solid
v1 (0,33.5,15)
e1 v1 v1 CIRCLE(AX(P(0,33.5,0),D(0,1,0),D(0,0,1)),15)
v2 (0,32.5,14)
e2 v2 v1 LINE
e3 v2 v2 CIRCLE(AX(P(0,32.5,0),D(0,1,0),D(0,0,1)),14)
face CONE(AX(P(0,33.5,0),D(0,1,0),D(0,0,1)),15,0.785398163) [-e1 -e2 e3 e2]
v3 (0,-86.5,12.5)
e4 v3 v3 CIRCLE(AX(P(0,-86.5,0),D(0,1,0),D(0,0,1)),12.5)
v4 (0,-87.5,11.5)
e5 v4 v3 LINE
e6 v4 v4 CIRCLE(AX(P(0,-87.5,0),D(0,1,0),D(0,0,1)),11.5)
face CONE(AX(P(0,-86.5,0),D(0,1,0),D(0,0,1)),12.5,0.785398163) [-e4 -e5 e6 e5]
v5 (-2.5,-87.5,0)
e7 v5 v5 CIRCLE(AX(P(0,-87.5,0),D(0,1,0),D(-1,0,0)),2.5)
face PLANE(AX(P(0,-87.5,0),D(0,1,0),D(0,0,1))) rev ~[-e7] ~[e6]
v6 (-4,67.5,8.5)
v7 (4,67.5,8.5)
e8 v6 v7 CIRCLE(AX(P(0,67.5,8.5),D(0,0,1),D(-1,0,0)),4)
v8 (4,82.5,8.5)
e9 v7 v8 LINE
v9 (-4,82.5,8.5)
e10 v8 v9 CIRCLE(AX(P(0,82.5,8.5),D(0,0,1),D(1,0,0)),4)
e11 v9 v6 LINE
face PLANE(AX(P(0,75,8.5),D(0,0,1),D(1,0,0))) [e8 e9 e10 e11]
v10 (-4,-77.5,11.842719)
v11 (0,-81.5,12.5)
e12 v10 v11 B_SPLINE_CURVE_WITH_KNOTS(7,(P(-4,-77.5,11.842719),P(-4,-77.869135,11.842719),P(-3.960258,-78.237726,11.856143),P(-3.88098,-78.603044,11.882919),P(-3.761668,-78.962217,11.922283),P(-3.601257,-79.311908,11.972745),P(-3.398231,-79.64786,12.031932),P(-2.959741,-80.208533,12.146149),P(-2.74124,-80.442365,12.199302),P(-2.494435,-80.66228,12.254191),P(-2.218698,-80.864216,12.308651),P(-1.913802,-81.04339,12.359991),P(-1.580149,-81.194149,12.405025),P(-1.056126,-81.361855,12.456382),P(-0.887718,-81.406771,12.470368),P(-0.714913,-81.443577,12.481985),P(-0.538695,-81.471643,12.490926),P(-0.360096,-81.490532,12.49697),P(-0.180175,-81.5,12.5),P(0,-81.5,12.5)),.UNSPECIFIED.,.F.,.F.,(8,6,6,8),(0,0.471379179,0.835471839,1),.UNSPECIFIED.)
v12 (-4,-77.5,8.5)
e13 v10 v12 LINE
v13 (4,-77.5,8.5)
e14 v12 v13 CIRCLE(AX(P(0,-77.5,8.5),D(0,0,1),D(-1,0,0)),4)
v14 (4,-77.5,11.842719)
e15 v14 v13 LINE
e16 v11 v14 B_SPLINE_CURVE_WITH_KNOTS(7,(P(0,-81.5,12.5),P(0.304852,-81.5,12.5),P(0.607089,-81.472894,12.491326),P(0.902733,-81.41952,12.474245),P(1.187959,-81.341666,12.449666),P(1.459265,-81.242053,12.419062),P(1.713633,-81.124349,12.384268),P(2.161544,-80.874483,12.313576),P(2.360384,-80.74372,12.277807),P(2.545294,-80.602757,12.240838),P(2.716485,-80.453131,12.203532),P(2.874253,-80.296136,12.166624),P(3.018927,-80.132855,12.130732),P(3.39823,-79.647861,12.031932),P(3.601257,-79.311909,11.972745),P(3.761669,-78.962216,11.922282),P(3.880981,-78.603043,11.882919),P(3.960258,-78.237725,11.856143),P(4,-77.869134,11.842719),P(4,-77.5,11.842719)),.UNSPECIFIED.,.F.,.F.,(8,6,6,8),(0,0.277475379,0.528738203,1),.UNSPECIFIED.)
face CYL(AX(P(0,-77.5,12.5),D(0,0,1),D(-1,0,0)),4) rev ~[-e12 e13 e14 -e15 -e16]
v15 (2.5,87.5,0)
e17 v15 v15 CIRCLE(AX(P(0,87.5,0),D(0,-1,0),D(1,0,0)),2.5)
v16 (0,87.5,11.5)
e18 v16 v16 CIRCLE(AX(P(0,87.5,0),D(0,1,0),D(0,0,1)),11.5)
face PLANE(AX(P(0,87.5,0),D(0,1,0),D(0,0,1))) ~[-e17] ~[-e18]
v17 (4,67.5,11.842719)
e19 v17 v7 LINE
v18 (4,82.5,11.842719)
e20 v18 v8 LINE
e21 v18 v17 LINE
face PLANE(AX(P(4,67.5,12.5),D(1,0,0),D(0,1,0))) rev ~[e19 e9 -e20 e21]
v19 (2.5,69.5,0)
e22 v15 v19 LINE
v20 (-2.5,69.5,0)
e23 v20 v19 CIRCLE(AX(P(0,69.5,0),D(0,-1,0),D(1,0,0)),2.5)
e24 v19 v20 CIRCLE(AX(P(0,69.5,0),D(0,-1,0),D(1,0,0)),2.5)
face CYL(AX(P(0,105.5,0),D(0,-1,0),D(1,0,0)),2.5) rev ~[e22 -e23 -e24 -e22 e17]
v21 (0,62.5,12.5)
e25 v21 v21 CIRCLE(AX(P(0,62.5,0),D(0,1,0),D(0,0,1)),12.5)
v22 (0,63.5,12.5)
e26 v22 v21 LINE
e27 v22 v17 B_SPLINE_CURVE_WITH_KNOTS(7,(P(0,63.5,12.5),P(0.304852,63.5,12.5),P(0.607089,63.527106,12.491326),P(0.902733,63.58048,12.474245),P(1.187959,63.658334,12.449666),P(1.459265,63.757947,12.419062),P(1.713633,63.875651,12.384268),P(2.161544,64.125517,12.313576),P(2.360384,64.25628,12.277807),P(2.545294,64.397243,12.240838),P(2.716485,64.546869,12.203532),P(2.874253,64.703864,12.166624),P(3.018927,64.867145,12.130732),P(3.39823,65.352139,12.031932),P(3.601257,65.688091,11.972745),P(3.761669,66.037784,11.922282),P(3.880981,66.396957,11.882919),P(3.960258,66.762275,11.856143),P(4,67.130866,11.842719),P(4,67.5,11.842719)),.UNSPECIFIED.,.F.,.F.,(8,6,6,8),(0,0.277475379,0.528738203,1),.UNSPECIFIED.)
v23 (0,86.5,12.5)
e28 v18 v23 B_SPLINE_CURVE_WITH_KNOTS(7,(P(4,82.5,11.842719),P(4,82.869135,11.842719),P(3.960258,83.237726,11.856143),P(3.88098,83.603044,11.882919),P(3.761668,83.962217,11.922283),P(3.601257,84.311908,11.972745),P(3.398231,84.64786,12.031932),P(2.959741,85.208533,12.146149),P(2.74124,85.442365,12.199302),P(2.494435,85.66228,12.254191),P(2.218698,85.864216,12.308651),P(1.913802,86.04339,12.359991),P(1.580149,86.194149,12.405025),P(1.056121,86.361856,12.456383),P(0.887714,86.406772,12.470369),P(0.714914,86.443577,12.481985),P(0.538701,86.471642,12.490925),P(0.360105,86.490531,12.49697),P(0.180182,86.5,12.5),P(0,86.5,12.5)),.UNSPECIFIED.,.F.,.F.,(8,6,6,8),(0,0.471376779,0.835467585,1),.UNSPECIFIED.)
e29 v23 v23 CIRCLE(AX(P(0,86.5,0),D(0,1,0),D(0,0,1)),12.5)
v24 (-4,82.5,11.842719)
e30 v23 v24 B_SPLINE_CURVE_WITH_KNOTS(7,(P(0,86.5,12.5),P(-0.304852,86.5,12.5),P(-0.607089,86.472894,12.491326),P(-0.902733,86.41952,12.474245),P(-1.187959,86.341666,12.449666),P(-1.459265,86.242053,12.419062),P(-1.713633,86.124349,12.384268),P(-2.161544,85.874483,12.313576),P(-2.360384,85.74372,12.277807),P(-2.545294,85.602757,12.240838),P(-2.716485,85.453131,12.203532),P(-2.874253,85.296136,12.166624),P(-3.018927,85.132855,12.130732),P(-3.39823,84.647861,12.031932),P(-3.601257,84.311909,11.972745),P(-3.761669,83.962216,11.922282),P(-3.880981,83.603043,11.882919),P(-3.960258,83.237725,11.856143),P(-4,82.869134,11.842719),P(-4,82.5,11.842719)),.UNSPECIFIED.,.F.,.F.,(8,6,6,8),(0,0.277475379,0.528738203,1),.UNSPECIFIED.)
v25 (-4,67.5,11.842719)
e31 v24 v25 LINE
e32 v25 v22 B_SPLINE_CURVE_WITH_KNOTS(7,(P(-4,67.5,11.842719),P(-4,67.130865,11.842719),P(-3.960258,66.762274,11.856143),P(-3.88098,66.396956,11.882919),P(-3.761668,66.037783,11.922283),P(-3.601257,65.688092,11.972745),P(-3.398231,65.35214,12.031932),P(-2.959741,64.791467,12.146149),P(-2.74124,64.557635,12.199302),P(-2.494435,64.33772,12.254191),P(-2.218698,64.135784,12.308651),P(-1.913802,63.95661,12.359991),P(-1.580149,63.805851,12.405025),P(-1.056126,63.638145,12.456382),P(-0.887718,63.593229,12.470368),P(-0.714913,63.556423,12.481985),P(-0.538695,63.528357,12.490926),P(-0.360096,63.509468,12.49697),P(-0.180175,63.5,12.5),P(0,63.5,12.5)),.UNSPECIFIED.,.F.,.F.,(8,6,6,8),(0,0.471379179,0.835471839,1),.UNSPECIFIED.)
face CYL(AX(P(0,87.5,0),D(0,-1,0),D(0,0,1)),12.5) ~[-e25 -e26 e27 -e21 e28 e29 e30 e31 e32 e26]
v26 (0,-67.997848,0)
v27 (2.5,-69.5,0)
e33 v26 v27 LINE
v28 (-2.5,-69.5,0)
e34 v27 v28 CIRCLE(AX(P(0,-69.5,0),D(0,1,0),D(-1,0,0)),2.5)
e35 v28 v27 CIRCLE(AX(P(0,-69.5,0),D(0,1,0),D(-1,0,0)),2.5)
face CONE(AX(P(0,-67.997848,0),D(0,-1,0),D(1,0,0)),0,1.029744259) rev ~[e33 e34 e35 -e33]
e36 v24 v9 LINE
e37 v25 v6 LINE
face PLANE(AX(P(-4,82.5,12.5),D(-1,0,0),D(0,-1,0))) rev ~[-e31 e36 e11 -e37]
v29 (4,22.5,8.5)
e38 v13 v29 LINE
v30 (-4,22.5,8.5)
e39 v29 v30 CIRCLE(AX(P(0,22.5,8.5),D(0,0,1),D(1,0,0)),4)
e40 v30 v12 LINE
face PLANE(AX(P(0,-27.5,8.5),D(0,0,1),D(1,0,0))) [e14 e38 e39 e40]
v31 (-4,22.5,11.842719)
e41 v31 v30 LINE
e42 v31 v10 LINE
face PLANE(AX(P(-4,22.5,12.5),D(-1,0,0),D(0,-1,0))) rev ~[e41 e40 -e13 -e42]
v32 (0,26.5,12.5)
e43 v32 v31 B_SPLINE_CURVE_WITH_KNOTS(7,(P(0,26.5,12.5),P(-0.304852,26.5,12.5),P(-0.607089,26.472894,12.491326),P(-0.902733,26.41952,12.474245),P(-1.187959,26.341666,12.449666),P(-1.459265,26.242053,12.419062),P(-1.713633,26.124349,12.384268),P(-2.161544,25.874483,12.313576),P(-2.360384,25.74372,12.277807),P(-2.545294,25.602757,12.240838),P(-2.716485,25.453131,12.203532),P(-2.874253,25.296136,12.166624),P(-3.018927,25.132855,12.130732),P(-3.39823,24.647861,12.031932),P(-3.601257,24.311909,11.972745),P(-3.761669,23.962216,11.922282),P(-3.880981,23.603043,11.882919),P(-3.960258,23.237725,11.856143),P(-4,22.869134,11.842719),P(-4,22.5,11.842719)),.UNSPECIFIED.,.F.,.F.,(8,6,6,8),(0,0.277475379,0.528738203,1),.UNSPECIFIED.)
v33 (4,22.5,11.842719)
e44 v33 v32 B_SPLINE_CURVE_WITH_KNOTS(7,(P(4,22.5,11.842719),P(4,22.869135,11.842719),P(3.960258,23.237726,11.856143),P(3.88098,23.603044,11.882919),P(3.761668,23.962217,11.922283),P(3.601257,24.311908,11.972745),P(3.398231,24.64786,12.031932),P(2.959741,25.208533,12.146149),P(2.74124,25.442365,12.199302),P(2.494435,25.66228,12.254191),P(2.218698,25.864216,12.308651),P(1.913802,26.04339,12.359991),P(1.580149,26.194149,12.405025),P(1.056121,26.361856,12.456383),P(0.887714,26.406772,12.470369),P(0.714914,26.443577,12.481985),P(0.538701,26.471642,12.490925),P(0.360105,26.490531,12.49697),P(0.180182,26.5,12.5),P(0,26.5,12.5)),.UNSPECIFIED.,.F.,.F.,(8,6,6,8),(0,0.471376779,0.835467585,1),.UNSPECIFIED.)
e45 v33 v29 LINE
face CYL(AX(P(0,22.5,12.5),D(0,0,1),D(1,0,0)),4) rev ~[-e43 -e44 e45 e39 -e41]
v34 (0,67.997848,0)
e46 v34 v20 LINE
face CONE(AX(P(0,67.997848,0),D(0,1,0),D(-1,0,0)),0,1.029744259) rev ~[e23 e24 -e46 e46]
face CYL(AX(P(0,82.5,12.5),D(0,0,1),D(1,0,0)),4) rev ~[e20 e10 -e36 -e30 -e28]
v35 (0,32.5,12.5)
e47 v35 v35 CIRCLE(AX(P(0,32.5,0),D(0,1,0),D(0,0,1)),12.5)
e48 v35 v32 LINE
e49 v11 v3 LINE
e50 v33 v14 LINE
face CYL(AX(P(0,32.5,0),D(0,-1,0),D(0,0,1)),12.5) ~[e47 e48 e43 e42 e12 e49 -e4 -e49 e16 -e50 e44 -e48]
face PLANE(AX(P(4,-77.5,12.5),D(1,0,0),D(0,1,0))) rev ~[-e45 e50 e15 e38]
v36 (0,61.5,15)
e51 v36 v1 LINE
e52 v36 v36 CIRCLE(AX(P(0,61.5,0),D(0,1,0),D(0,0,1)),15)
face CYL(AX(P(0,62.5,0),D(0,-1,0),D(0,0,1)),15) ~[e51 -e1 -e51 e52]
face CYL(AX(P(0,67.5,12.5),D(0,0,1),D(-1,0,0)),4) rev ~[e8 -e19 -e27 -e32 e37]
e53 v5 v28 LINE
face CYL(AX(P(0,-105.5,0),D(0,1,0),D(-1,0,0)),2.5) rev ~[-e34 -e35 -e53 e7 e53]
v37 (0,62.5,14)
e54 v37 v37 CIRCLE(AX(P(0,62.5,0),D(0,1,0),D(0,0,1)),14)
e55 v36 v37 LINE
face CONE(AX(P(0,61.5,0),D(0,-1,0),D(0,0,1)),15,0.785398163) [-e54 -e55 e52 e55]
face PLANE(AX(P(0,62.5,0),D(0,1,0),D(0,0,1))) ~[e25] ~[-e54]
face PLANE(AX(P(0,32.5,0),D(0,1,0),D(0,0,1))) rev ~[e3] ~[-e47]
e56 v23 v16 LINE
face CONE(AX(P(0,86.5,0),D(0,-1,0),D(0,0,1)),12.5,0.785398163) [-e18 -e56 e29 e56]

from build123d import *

# Parameters (mm, degrees)
F4_D           = 5
F4_DEPTH       = 18
F4_TIP         = 1.5021515476
F4_ON_F3_D     = 5
F4_ON_F3_DEPTH = 18
F4_ON_F3_TIP   = 1.5021515476
F5_SIZE        = 1
F8_DEPTH       = 4


with BuildPart() as f1:
    # F0 (on Right) → F1 (revolve)
    with BuildSketch(Plane.YZ):
        Polygon((-87.5, 12.5), (-87.5, 0), (87.5, 0), (87.5, 12.5), (62.5, 12.5), (62.5, 15), (32.5, 15), (32.5, 12.5), align=None)
    revolve(axis=Axis((0, 0, 0), (0, 1, 0)))

    # F4
    with Locations(Plane.XZ.offset(87.5)):
        with Locations((0, 0)):
            Hole(F4_D / 2, depth=F4_DEPTH)
            with Locations((0, 0, -(F4_DEPTH + F4_TIP / 2))):  # 118° drill point
                Cone(0, F4_D / 2, F4_TIP, mode=Mode.SUBTRACT)

    # F4 on F3
    with Locations(Plane(origin=(0, 87.5, 0), x_dir=(-1, 0, 0), z_dir=(0, 1, 0))):
        with Locations((0, 0)):
            Hole(F4_ON_F3_D / 2, depth=F4_ON_F3_DEPTH)
            with Locations((0, 0, -(F4_ON_F3_DEPTH + F4_ON_F3_TIP / 2))):  # 118° drill point
                Cone(0, F4_ON_F3_D / 2, F4_ON_F3_TIP, mode=Mode.SUBTRACT)

    # F5
    f5_edges = [f1.edges().sort_by_distance(p)[0] for p in [
        (0, -87.5, -12.5),
        (0, 87.5, -12.5),
        (0, 32.5, -15),
        (0, 62.5, -15),
    ]]
    chamfer(f5_edges, length=F5_SIZE)

    # F7 (on offset) → F8 (cut)
    with BuildSketch(Plane.XY.offset(12.5)):
        with BuildLine():
            ThreePointArc((-4, -77.5), (0, -81.5), (4, -77.5))
            Line((4, -77.5), (4, 22.5))
            ThreePointArc((4, 22.5), (0, 26.5), (-4, 22.5))
            Line((-4, 22.5), (-4, -77.5))
        make_face()
        with BuildLine():
            ThreePointArc((-4, 67.5), (0, 63.5), (4, 67.5))
            Line((4, 67.5), (4, 82.5))
            ThreePointArc((4, 82.5), (0, 86.5), (-4, 82.5))
            Line((-4, 82.5), (-4, 67.5))
        make_face()
    extrude(amount=-F8_DEPTH, mode=Mode.SUBTRACT)


solid = f1.part
